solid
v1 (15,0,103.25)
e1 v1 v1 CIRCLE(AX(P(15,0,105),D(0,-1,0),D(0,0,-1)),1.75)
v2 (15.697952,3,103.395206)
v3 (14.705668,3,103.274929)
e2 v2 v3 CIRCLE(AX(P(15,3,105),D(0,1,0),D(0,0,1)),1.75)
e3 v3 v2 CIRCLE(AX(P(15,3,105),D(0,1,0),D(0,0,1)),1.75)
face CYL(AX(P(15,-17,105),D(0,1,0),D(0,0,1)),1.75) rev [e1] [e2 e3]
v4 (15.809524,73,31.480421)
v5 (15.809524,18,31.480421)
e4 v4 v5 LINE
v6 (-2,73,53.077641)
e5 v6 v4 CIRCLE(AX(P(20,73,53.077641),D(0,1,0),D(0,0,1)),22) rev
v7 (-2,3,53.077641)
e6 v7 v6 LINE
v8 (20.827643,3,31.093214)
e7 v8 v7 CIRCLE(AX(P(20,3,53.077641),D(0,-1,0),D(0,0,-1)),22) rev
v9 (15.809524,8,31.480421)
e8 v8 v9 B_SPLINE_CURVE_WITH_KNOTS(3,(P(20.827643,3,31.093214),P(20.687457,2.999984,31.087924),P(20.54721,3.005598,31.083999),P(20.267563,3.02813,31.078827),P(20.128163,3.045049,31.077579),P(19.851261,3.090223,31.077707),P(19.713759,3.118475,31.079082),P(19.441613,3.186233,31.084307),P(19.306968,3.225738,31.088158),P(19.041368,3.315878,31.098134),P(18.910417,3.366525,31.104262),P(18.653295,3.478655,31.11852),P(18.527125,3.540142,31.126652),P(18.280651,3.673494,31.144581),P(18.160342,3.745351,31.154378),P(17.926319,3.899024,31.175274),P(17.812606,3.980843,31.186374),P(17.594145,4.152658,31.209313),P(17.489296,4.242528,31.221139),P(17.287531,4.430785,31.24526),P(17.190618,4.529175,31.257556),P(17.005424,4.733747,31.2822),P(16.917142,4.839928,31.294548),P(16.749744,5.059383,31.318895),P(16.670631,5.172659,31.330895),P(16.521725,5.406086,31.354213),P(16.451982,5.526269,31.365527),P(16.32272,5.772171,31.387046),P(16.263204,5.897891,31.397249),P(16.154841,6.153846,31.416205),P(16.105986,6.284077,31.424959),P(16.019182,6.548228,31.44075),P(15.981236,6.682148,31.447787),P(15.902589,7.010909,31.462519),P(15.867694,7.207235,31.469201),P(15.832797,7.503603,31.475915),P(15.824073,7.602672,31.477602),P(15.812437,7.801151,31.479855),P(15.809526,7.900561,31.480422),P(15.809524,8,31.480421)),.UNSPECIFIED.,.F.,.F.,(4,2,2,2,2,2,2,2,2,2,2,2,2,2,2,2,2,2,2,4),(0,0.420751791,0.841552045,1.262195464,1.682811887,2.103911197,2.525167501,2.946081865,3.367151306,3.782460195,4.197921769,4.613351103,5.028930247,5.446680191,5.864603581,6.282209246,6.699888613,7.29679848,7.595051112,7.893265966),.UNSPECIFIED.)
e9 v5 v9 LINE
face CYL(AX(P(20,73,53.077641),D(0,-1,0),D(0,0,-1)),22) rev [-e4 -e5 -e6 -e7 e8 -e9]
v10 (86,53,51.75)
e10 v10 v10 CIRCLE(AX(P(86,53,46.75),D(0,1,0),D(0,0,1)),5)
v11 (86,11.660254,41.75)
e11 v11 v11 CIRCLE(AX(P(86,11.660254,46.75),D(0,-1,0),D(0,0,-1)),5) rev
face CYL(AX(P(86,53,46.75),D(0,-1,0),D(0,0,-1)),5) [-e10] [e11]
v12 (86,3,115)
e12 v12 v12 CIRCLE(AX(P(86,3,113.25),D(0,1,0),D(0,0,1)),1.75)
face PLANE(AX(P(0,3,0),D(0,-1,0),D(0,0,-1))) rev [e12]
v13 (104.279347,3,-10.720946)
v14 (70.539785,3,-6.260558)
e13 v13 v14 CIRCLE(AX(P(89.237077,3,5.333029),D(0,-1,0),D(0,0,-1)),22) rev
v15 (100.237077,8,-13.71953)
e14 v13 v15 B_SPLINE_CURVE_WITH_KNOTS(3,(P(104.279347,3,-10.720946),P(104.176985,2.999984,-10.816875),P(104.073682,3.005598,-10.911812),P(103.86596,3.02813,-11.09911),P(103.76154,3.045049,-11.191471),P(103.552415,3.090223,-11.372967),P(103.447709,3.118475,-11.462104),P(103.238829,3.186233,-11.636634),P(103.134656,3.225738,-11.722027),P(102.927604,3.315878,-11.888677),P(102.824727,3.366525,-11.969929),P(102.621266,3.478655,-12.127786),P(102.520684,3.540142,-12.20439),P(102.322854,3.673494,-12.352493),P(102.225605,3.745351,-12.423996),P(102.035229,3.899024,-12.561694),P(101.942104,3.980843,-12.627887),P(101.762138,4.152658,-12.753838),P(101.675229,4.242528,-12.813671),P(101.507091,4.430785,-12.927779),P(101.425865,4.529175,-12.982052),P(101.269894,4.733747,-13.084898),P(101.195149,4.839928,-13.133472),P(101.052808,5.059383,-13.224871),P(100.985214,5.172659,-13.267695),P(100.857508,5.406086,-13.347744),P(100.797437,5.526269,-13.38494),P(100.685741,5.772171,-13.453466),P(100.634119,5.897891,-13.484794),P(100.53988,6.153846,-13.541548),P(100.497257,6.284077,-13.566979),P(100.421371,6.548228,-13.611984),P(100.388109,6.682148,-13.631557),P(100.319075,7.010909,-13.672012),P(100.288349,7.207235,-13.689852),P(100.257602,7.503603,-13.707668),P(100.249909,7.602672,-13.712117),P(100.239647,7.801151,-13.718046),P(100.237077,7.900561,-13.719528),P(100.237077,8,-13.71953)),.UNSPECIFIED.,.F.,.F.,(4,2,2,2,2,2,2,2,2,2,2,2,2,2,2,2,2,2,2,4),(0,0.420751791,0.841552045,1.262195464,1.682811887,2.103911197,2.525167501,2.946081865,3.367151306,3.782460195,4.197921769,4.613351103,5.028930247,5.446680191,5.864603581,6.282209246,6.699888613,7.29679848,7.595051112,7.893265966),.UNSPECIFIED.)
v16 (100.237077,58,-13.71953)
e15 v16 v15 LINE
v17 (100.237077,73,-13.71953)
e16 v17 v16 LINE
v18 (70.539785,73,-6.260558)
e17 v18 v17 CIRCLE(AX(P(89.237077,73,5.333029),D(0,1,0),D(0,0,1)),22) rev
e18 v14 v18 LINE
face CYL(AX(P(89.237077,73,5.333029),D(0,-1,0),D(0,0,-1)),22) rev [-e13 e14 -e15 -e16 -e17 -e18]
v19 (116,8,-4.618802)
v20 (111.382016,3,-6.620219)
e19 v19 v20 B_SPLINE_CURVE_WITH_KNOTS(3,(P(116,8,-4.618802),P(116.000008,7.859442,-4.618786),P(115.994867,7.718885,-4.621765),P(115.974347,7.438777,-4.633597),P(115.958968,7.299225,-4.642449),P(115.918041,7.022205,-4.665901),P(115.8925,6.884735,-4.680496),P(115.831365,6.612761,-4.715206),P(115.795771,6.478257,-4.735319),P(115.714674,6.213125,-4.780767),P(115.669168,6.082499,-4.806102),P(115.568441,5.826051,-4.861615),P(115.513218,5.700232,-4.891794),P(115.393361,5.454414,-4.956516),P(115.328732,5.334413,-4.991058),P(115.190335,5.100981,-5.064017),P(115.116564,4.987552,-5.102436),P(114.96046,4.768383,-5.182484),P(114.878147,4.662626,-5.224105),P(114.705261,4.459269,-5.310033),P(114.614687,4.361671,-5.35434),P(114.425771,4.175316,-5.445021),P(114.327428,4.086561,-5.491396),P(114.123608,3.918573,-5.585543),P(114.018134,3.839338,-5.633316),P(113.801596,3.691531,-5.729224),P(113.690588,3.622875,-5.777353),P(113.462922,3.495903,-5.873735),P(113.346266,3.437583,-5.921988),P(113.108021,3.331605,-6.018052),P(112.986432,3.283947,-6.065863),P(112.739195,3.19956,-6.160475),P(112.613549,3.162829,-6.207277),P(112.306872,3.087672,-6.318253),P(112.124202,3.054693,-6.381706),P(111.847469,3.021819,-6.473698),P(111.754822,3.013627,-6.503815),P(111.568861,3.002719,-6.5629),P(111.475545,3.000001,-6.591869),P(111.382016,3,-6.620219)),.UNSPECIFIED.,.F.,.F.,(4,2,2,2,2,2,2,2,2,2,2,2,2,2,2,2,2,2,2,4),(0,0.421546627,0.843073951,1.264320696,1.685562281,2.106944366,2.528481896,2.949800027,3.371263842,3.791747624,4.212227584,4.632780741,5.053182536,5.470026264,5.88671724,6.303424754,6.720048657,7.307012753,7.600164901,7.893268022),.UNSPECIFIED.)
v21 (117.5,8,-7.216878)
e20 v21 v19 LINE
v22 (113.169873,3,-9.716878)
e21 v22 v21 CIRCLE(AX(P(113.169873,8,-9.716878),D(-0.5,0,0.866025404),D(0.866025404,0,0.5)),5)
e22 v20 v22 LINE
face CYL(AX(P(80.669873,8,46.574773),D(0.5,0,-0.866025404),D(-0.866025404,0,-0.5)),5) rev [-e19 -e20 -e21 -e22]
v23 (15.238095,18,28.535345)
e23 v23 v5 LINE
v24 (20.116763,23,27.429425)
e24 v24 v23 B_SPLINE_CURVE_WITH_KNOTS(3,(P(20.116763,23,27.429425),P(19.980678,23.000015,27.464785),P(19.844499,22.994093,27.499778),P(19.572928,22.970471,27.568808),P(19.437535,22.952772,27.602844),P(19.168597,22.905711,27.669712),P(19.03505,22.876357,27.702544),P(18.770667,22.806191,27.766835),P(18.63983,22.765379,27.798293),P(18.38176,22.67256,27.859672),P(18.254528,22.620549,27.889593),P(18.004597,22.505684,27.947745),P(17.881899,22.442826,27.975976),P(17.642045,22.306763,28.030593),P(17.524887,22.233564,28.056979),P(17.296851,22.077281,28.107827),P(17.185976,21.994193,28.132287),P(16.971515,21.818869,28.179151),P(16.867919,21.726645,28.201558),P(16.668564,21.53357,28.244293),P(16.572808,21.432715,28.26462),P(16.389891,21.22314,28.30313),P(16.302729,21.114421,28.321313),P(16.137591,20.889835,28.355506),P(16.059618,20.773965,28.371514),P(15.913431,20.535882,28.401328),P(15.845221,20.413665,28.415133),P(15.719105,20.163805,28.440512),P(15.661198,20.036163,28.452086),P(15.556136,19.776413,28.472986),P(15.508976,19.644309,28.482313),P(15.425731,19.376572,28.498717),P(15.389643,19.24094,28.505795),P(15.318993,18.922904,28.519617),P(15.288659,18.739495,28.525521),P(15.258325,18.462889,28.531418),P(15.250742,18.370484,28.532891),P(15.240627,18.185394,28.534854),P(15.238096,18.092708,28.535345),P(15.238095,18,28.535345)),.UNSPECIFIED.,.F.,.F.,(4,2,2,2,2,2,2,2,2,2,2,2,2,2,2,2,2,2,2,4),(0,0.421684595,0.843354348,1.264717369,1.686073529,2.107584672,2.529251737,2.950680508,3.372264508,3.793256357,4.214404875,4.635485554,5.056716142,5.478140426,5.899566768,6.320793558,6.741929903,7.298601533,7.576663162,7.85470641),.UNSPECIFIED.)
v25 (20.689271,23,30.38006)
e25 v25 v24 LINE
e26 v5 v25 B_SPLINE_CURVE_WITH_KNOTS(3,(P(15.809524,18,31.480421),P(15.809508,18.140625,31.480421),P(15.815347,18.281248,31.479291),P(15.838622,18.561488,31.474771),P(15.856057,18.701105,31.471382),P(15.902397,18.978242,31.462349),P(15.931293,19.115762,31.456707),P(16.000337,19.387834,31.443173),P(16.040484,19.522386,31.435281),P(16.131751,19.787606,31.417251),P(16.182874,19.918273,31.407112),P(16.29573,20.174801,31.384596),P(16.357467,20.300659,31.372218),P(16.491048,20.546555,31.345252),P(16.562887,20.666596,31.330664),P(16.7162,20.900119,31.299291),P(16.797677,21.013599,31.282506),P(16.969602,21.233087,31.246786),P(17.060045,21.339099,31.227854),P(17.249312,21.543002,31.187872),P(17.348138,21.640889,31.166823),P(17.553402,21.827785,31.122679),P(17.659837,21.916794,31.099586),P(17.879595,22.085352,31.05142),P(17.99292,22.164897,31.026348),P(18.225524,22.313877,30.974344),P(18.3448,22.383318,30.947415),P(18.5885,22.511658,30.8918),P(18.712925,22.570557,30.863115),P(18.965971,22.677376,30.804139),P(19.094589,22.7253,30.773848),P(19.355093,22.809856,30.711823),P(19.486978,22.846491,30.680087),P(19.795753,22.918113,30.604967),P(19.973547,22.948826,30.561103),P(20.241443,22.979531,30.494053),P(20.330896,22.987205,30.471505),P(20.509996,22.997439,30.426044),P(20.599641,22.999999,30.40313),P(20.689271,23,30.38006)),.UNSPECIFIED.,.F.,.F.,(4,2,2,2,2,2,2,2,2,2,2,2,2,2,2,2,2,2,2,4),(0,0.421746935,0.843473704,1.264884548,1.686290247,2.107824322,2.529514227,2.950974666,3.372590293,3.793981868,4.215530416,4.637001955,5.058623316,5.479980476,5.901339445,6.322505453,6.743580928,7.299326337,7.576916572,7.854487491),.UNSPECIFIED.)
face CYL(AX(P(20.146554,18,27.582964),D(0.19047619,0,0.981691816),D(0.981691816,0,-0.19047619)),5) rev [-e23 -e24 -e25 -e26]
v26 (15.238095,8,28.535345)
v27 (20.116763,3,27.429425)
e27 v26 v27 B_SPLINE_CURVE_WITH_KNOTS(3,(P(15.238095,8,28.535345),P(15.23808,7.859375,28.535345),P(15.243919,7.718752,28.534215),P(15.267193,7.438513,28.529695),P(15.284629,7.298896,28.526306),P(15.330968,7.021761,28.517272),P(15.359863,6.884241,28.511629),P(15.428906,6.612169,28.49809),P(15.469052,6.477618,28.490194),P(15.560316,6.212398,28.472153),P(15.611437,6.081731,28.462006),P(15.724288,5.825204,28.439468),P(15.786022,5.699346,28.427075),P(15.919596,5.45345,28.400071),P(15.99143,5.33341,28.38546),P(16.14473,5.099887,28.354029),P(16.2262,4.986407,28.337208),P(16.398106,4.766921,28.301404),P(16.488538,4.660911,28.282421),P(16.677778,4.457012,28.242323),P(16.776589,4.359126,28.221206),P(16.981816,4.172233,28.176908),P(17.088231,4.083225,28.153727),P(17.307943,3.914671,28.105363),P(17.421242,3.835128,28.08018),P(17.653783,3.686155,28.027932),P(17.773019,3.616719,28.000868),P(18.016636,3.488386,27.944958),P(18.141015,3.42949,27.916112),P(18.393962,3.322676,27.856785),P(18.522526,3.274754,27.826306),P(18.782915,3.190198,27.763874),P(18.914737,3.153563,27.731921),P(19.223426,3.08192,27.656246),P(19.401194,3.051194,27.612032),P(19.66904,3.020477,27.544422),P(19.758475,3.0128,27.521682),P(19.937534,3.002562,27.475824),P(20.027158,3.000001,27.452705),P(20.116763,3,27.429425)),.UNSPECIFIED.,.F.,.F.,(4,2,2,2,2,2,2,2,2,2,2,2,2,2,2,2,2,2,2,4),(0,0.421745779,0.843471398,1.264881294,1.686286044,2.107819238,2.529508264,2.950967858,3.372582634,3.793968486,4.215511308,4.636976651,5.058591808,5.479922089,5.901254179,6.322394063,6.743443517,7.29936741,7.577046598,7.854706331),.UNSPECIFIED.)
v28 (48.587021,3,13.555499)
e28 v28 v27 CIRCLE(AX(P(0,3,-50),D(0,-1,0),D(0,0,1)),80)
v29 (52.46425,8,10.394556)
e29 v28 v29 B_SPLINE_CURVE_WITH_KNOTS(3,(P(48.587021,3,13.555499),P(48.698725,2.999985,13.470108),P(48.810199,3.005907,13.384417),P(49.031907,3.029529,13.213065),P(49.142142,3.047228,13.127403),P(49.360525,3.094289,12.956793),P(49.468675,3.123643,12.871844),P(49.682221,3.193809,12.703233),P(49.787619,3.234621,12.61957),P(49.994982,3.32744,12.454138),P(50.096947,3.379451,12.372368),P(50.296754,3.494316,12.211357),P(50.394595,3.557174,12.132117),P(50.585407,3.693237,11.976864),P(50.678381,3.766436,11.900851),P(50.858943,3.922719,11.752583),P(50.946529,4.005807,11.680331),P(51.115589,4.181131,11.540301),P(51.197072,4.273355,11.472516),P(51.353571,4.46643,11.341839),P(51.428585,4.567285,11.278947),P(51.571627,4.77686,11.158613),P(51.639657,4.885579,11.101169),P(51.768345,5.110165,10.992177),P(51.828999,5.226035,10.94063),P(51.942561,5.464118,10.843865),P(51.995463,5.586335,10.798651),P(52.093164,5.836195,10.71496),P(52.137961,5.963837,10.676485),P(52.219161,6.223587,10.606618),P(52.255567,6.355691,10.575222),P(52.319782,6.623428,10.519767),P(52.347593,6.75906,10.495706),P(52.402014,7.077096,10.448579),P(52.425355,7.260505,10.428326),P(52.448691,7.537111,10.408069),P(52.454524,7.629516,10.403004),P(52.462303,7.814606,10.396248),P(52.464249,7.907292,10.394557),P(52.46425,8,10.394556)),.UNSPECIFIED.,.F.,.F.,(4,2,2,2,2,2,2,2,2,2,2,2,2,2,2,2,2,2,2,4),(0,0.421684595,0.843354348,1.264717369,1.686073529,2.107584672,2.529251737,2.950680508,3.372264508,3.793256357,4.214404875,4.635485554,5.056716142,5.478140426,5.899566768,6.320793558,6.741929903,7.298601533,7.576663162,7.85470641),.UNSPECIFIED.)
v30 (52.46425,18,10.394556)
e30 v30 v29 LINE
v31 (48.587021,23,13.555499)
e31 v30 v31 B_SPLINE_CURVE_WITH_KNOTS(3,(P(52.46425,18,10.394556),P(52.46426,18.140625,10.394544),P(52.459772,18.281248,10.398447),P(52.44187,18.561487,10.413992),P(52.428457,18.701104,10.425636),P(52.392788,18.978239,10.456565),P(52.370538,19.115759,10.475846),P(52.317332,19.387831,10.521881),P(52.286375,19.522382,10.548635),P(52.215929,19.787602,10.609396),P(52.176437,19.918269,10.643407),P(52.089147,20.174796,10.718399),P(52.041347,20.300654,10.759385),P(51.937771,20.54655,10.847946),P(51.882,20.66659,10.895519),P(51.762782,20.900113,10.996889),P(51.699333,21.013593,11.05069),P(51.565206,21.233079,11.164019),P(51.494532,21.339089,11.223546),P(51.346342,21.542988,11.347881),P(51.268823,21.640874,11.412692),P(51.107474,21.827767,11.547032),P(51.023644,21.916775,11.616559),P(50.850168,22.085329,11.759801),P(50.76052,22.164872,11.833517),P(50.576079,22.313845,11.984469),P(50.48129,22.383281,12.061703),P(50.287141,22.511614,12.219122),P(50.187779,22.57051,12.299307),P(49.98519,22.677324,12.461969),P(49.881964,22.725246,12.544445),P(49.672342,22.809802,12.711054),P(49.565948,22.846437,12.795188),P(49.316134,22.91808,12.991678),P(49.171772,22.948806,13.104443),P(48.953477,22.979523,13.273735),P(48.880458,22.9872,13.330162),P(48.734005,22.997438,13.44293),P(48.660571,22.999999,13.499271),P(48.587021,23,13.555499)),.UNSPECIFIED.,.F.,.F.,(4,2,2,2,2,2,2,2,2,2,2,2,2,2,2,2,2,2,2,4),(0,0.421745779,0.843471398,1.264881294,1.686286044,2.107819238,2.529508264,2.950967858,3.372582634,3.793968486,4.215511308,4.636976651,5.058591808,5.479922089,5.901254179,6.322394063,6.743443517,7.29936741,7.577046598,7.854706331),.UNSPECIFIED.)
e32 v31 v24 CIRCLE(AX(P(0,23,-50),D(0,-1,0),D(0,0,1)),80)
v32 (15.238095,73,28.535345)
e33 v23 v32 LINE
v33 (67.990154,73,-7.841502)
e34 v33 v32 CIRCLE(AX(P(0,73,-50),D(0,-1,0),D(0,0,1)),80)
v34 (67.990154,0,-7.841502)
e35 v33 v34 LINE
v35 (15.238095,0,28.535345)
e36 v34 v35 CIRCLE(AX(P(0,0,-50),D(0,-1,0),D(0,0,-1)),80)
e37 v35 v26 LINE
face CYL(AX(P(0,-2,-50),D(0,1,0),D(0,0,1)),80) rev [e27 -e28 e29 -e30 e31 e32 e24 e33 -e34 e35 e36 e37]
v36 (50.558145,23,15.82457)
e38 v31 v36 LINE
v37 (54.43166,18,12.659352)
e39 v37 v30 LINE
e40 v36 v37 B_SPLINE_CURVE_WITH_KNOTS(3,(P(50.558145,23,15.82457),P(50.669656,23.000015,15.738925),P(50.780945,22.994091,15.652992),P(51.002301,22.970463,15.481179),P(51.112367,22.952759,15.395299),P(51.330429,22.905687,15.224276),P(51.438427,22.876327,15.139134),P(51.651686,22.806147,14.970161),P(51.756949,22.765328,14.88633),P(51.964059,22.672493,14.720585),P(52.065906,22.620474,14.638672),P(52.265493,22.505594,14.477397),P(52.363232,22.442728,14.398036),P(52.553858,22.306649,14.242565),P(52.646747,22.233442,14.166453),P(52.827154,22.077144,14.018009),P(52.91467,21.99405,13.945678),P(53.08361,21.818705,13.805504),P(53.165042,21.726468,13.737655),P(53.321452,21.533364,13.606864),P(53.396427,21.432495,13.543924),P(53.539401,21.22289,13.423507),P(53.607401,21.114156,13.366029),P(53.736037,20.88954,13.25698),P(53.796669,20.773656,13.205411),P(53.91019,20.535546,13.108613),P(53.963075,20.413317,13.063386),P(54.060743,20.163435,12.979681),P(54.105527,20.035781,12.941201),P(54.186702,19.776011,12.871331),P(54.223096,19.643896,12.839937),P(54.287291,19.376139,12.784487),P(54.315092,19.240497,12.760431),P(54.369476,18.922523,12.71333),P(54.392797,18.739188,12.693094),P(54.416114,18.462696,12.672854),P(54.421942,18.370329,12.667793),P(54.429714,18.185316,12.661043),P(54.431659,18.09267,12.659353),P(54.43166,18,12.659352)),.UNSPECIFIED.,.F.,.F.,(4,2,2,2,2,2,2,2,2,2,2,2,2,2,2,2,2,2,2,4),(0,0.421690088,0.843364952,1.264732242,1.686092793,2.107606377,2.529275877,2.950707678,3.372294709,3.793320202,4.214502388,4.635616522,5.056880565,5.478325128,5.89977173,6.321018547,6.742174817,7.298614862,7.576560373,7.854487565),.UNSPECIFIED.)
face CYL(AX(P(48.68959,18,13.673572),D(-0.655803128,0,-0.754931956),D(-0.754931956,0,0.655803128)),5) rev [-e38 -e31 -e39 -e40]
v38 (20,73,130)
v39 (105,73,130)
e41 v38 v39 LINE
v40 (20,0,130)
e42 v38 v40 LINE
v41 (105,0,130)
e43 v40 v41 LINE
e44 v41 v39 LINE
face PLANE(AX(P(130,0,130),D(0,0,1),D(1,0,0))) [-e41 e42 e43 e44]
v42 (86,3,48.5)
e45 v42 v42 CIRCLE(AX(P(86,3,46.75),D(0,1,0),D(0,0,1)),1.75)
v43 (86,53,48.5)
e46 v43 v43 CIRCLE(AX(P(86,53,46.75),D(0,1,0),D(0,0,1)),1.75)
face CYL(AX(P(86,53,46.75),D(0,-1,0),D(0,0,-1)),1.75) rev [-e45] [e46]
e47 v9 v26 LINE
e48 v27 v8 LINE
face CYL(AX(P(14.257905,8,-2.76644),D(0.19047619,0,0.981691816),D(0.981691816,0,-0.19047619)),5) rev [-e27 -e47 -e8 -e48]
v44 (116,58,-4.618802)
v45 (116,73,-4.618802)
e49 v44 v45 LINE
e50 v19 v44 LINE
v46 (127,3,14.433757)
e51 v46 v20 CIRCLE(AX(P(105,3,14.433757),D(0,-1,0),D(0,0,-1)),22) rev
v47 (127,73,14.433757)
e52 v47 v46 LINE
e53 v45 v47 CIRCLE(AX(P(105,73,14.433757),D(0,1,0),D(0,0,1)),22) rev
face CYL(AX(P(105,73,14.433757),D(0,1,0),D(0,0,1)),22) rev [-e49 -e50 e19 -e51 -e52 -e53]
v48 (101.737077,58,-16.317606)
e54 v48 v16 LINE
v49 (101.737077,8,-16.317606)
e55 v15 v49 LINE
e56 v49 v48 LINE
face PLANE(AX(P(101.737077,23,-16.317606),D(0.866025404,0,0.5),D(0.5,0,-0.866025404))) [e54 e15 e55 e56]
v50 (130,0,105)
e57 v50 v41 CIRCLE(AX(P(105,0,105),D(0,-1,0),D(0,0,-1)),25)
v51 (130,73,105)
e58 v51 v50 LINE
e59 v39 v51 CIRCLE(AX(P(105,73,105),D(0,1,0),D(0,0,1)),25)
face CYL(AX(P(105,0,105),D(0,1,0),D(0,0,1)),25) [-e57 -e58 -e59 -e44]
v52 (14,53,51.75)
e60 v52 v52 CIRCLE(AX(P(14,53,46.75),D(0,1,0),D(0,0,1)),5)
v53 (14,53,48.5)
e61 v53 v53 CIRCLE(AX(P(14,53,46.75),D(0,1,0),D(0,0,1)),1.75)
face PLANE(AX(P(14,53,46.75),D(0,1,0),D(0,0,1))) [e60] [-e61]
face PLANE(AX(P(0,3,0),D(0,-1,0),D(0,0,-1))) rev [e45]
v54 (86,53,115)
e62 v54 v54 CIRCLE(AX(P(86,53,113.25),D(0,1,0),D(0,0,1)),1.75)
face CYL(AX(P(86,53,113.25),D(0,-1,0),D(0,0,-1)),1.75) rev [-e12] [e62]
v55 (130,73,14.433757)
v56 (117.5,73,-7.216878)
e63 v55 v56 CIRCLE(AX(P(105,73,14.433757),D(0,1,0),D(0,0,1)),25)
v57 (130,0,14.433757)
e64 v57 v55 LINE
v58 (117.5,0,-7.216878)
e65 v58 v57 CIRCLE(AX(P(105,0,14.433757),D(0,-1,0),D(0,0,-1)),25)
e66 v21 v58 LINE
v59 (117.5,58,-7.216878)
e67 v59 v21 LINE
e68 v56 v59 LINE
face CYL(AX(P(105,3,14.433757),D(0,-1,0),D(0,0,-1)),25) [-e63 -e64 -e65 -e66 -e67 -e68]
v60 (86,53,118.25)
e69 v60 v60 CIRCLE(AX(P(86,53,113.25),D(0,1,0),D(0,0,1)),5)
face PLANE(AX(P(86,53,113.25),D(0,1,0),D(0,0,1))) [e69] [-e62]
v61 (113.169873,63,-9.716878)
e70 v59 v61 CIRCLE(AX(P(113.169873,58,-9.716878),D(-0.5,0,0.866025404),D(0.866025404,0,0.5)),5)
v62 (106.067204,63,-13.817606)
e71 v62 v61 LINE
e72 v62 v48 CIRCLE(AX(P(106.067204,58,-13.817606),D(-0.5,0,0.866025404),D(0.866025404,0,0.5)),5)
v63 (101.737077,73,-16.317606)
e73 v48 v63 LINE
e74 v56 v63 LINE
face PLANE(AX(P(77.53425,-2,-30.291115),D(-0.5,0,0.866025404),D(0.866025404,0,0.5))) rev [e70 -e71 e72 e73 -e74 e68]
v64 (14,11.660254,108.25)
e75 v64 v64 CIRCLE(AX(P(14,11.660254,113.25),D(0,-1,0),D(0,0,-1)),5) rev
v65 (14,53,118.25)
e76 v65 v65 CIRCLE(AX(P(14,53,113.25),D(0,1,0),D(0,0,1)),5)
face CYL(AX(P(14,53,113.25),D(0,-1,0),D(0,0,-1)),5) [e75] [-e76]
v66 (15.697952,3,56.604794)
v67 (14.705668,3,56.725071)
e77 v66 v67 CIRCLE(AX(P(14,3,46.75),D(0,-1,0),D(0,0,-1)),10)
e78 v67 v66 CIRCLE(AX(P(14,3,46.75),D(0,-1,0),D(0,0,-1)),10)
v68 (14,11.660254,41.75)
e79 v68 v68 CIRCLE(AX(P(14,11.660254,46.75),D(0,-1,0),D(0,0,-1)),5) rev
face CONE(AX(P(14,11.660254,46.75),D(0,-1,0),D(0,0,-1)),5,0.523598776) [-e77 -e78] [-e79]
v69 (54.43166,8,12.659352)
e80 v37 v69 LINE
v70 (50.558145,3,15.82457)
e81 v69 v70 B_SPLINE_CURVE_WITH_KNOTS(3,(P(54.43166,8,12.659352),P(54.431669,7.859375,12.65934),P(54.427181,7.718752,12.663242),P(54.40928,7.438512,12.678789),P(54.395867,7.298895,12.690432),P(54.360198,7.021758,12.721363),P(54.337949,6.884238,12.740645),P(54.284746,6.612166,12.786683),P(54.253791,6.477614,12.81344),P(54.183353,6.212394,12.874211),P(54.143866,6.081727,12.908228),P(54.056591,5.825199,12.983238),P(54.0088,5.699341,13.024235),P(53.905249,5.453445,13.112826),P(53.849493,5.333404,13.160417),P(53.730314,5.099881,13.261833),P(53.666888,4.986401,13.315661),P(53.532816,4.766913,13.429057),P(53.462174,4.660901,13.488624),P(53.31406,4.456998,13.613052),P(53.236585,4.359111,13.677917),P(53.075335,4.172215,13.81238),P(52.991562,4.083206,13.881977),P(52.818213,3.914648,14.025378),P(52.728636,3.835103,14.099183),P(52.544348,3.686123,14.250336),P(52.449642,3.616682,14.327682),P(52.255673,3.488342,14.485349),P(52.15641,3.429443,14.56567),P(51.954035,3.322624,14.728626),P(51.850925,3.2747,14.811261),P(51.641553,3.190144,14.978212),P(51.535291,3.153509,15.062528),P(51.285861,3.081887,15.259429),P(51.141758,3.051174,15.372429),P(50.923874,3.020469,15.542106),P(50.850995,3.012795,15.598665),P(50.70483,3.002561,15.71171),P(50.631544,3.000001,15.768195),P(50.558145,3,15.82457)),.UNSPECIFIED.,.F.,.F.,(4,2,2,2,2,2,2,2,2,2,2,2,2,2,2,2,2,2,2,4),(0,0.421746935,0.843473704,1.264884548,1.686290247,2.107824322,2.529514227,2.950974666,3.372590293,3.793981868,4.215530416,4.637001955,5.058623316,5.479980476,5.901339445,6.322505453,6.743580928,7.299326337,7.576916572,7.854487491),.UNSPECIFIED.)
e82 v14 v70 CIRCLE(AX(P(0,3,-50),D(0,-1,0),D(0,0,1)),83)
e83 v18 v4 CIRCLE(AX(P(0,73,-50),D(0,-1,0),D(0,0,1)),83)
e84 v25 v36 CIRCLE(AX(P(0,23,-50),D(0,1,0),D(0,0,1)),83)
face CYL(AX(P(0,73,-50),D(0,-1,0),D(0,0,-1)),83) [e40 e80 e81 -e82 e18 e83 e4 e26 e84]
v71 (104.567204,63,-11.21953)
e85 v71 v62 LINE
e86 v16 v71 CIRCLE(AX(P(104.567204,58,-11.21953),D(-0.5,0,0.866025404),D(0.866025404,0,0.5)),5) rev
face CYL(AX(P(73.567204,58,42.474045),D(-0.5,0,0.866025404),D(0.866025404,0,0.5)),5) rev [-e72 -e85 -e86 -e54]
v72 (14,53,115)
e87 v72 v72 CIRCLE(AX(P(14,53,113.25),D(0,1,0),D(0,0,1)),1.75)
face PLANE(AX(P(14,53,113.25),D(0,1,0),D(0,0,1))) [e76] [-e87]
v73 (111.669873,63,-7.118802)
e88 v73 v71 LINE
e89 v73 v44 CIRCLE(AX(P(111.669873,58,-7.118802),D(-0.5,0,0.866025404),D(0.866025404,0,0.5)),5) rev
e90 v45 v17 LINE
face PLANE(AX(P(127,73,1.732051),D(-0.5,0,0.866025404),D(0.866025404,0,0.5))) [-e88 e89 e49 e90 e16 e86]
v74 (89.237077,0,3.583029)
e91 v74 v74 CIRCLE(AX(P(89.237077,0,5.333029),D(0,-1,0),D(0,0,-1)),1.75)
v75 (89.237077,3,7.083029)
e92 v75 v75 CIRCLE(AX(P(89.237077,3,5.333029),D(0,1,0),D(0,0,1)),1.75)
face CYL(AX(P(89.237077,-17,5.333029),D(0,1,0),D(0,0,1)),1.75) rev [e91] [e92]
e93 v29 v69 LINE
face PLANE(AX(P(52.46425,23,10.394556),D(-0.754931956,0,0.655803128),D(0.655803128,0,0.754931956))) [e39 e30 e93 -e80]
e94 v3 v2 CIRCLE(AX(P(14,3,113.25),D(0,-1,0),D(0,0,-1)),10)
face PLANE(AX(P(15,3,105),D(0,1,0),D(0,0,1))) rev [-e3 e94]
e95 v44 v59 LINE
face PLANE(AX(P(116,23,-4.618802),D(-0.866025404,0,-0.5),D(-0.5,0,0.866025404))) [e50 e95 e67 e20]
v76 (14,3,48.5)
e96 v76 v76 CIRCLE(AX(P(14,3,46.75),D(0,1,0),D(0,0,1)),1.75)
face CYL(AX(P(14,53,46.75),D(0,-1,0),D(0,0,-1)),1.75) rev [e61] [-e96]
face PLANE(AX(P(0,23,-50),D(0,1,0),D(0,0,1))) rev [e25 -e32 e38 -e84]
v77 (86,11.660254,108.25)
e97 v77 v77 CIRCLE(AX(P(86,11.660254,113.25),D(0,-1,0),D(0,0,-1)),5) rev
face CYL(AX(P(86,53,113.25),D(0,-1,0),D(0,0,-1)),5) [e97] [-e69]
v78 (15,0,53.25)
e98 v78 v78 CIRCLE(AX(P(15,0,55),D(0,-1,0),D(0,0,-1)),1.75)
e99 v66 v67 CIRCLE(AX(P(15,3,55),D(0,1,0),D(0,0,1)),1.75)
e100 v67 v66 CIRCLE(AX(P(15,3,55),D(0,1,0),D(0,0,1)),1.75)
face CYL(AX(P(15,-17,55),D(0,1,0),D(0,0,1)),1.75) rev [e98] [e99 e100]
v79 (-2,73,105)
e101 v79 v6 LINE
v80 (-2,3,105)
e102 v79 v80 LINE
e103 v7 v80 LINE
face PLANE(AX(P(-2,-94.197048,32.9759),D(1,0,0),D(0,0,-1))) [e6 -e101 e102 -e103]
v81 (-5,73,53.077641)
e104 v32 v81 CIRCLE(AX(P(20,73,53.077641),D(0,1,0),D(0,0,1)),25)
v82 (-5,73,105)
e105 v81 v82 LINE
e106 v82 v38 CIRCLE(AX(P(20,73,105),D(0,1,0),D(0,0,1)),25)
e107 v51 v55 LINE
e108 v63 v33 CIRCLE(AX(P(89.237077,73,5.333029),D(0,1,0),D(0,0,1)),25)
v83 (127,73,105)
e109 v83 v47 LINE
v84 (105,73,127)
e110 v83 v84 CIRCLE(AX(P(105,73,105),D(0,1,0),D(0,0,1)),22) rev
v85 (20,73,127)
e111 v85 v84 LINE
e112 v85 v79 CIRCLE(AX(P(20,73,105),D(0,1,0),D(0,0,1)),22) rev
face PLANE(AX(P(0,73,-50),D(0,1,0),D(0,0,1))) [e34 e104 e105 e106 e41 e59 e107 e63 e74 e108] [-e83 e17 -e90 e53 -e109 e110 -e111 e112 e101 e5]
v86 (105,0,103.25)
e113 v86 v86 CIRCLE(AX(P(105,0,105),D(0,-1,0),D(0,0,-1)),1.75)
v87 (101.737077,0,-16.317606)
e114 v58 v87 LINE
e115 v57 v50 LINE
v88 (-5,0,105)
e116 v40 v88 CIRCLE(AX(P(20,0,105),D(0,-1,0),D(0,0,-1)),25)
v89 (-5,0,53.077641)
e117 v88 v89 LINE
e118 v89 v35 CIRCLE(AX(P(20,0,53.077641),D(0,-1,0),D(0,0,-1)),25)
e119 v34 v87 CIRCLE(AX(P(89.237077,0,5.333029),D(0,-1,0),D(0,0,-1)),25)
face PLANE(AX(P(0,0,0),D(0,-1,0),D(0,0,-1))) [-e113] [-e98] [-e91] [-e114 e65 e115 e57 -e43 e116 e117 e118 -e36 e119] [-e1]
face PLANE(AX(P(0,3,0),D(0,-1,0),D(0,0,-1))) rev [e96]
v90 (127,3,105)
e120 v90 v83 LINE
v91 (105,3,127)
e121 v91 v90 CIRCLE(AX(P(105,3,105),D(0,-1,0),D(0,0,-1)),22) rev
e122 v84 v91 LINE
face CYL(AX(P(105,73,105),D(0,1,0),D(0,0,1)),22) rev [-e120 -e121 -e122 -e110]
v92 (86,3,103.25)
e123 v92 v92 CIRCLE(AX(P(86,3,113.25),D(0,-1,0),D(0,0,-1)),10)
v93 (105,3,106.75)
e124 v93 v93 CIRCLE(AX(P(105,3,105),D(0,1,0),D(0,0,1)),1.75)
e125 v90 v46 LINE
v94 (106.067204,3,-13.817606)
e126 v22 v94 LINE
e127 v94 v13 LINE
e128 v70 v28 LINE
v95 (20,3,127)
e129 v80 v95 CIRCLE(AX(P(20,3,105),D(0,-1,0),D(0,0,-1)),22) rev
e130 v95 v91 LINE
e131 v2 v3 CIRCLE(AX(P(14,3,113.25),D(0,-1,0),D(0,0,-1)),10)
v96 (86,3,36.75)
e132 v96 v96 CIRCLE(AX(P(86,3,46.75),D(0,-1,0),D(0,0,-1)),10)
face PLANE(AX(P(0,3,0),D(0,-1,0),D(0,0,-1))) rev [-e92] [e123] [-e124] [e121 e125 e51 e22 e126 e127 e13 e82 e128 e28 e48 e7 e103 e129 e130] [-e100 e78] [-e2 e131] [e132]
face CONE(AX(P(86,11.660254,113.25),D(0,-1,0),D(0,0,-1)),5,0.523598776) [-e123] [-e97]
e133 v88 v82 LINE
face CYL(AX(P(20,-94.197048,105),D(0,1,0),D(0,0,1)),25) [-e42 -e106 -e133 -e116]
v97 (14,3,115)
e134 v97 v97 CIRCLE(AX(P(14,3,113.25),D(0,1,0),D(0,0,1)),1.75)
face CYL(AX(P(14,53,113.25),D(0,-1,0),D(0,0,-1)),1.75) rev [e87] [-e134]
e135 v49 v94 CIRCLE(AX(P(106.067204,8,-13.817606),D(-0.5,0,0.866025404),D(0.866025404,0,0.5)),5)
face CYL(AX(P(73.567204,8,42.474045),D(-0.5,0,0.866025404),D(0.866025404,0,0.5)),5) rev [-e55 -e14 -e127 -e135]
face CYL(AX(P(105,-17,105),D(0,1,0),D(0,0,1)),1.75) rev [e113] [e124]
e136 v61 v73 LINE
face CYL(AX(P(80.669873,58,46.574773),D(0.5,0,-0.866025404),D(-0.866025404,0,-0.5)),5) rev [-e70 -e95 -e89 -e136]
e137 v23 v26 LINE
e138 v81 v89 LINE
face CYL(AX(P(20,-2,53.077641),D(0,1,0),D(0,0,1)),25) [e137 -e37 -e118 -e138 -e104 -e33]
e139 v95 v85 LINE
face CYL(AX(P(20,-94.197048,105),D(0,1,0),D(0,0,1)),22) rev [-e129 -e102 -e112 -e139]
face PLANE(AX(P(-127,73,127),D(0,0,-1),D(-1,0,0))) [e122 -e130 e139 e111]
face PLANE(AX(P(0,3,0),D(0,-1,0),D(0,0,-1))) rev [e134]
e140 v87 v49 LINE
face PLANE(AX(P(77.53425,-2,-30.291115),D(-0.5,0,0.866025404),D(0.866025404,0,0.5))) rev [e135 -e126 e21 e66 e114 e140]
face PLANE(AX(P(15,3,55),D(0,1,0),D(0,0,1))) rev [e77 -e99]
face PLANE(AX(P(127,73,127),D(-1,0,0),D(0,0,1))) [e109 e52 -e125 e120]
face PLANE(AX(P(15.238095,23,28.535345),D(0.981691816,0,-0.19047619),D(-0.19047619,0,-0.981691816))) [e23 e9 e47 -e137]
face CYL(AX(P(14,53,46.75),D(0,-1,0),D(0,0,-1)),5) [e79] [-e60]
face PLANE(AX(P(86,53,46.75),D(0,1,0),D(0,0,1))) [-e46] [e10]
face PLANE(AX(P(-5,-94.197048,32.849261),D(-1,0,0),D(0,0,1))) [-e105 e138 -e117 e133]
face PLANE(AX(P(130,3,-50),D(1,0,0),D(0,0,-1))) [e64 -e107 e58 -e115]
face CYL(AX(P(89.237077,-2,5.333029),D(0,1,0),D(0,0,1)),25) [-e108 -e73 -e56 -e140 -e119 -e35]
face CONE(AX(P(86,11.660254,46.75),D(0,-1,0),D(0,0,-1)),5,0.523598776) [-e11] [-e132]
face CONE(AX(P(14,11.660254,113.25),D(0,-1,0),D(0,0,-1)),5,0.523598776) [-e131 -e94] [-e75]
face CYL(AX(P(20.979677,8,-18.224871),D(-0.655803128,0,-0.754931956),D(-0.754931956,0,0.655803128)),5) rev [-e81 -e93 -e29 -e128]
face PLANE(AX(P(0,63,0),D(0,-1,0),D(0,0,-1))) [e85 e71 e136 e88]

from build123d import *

# Parameters (mm, degrees)
SKETCH1_W           = 260
SKETCH1_H           = 100
BOSS_EXTRUDE1_DEPTH = 3
CUT_EXTRUDE1_DEPTH  = 5
SKETCH5_W           = 260
SKETCH5_H           = 80
BOSS_EXTRUDE4_DEPTH = 3
BOSS_EXTRUDE5_START = 70
BOSS_EXTRUDE5_DEPTH = 70
BOSS_EXTRUDE6_DEPTH = 70
CUT_EXTRUDE3_DEPTH  = 198.810515393
SKETCH10_R          = 5
SKETCH10_R_2        = 1.75
BOSS_EXTRUDE7_DEPTH = 50
CHAMFER1_SIZE       = 5
CHAMFER1_SIZE2      = 8.660254038
FILLET1_R           = 22
FILLET2_R           = 25
CUT_EXTRUDE4_START  = 20
CUT_EXTRUDE4_DEPTH  = 20
SKETCH12_R          = 1.75
CUT_EXTRUDE5_DEPTH  = 20
CUT_EXTRUDE6_DEPTH  = 40
FILLET3_R           = 5


with BuildPart() as part:
    # Sketch1 → Boss-Extrude1 (new body)
    with BuildSketch(Plane(origin=(0, 0, 0), x_dir=(1, 0, 0), z_dir=(0, 1, 0))):
        Rectangle(SKETCH1_W, SKETCH1_H)
    extrude(amount=BOSS_EXTRUDE1_DEPTH)

    # Sketch4 → Cut-Extrude1 (cut)
    with BuildSketch(Plane(origin=(0, 3, 0), x_dir=(1, 0, 0), z_dir=(0, 1, 0))):
        with BuildLine():
            Line((-77.534249575, 30.291115131), (-130, 0))
            Line((-130, 0), (-130, 50))
            Line((-130, 50), (130, 50))
            Line((130, 50), (130, 0))
            Line((130, 0), (77.534249575, 30.291115131))
            ThreePointArc((77.534249575, 30.291115131), (0, -30), (-77.534249575, 30.291115131))
        make_face()
    extrude(amount=-CUT_EXTRUDE1_DEPTH, mode=Mode.SUBTRACT)

    # Sketch5 → Boss-Extrude4 (add)
    with BuildSketch(Plane(origin=(0, 3, 0), x_dir=(1, 0, 0), z_dir=(0, 1, 0))):
        with Locations((0, -90)):
            Rectangle(SKETCH5_W, SKETCH5_H)
    extrude(amount=-BOSS_EXTRUDE4_DEPTH)

    # Sketch6 → Boss-Extrude5 (add)
    with BuildSketch(Plane(origin=(0, 3, 0), x_dir=(1, 0, 0), z_dir=(0, 1, 0)).offset(BOSS_EXTRUDE5_START)):
        with BuildLine():
            Line((-77.534249575, 30.291115131), (-130, 0))
            Line((-130, 0), (-130, -130))
            Line((-130, -130), (130, -130))
            Line((130, -130), (130, 0))
            Line((130, 0), (77.534249575, 30.291115131))
            ThreePointArc((77.534249575, 30.291115131), (0, -30), (-77.534249575, 30.291115131))
        make_face()
        with BuildLine():
            Line((-79.381629809, 25.76042804), (-127, -1.732050808))
            Line((-127, -1.732050808), (-127, -127))
            Line((-127, -127), (127, -127))
            Line((127, -127), (127, -1.732050808))
            Line((127, -1.732050808), (79.381629809, 25.76042804))
            ThreePointArc((79.381629809, 25.76042804), (0, -33), (-79.381629809, 25.76042804))
        make_face(mode=Mode.SUBTRACT)
    extrude(amount=-BOSS_EXTRUDE5_DEPTH)

    # Sketch7 → Boss-Extrude6 (add)
    with BuildSketch(Plane(origin=(0, 73, 0), x_dir=(1, 0, 0), z_dir=(0, 1, 0))):
        with BuildLine():
            Line((-5, -32.849260709), (-5, -130))
            Line((-5, -130), (-2, -130))
            Line((-2, -130), (-2, -32.975900116))
            ThreePointArc((-2, -32.975900116), (-3.500572722, -32.92614781), (-5, -32.849260709))
        make_face()
    extrude(amount=-BOSS_EXTRUDE6_DEPTH)

    # Sketch9 → Cut-Extrude3 (cut, through all)
    with BuildSketch(Plane(origin=(0, 73, 0), x_dir=(1, 0, 0), z_dir=(0, 1, 0))):
        Polygon((-5, -32.849260709), (-5, -144.876678539), (-379.728059333, -144.876678539), (-379.728059333, 52.069032857), (-5, 52.069032857), align=None)
    extrude(amount=-CUT_EXTRUDE3_DEPTH, mode=Mode.SUBTRACT)

    # Sketch10 → Boss-Extrude7 (add)
    # profile 1 of 4: a face of its own
    with BuildSketch(Plane(origin=(0, 3, 0), x_dir=(1, 0, 0), z_dir=(0, 1, 0))):
        with Locations(Location((14, -46.75, 0), (0, 0, 90))):
            Circle(SKETCH10_R)
        with Locations(Location((14, -46.75, 0), (0, 0, 270))):
            Circle(SKETCH10_R_2, mode=Mode.SUBTRACT)
    # profile 2 of 4: a face of its own
    with BuildSketch(Plane(origin=(0, 3, 0), x_dir=(1, 0, 0), z_dir=(0, 1, 0))):
        with Locations(Location((86, -46.75, 0), (0, 0, 90))):
            Circle(SKETCH10_R)
        with Locations(Location((86, -46.75, 0), (0, 0, 270))):
            Circle(SKETCH10_R_2, mode=Mode.SUBTRACT)
    # profile 3 of 4: a face of its own
    with BuildSketch(Plane(origin=(0, 3, 0), x_dir=(1, 0, 0), z_dir=(0, 1, 0))):
        with Locations(Location((86, -113.25, 0), (0, 0, 90))):
            Circle(SKETCH10_R)
        with Locations(Location((86, -113.25, 0), (0, 0, 270))):
            Circle(SKETCH10_R_2, mode=Mode.SUBTRACT)
    # profile 4 of 4: a face of its own
    with BuildSketch(Plane(origin=(0, 3, 0), x_dir=(1, 0, 0), z_dir=(0, 1, 0))):
        with Locations(Location((14, -113.25, 0), (0, 0, 90))):
            Circle(SKETCH10_R)
        with Locations(Location((14, -113.25, 0), (0, 0, 270))):
            Circle(SKETCH10_R_2, mode=Mode.SUBTRACT)
    extrude(amount=BOSS_EXTRUDE7_DEPTH)

    # Chamfer1
    chamfer1_edges = [part.edges().sort_by_distance(p)[0] for p in [
        (86, 3, 51.75),
        (14, 3, 51.75),
        (86, 3, 118.25),
        (14, 3, 118.25),
    ]]
    chamfer1_side = [part.faces().sort_by_distance(p)[0] for p in [
        (68.049806081, 3, 64.998636776),
    ]]
    chamfer(chamfer1_edges, length=CHAMFER1_SIZE, length2=CHAMFER1_SIZE2, reference=chamfer1_side[0])

    # Fillet1
    fillet1_edges = [part.edges().sort_by_distance(p)[0] for p in [
        (-2, 38, 127),
        (-2, 38, 32.975900116),
        (127, 38, 127),
        (127, 38, 1.732050808),
        (79.381629809, 38, -25.76042804),
    ]]
    fillet(fillet1_edges, radius=FILLET1_R)

    # Fillet2
    fillet2_edges = [part.edges().sort_by_distance(p)[0] for p in [
        (-5, 36.5, 29.843597113),
        (-5, 36.5, 130),
        (77.534249575, 36.5, -30.291115131),
        (130, 36.5, 0),
        (130, 36.5, 130),
    ]]
    fillet(fillet2_edges, radius=FILLET2_R)

    # Sketch11 → Cut-Extrude4 (cut)
    with BuildSketch(Plane(origin=(0, 3, 0), x_dir=(1, 0, 0), z_dir=(0, 1, 0)).offset(CUT_EXTRUDE4_START)):
        with BuildLine():
            Line((52.464250206, -10.394556462), (54.431659589, -12.65935233))
            ThreePointArc((54.431659589, -12.65935233), (36.359512028, -24.612236832), (15.80952381, -31.480420697))
            Line((15.80952381, -31.480420697), (15.238095238, -28.53534525))
            ThreePointArc((15.238095238, -28.53534525), (35.045312798, -21.915408995), (52.464250206, -10.394556462))
        make_face()
        Polygon((101.737077009, 16.317606197), (100.237077009, 13.719529986), (116, 4.618802154), (117.5, 7.216878365), align=None)
    extrude(amount=-CUT_EXTRUDE4_DEPTH, mode=Mode.SUBTRACT)

    # Sketch12 → Cut-Extrude5 (cut)
    with BuildSketch(Plane(origin=(0, 3, 0), x_dir=(1, 0, 0), z_dir=(0, 1, 0))):
        with Locations(Location((89.237077009, -5.333028897, 0), (0, 0, 270))):
            Circle(SKETCH12_R)
        with Locations(Location((105, -105, 0), (0, 0, 270))):
            Circle(SKETCH12_R)
        with Locations(Location((15, -105, 0), (0, 0, 66.494954424))):
            Circle(SKETCH12_R)
        with Locations(Location((15, -55, 0), (0, 0, 260.317408662))):
            Circle(SKETCH12_R)
    extrude(amount=-CUT_EXTRUDE5_DEPTH, mode=Mode.SUBTRACT)

    # Sketch14 → Cut-Extrude6 (cut)
    with BuildSketch(Plane.XZ.offset(-23)):
        Polygon((101.737077009, -16.317606197), (117.5, -7.216878365), (116, -4.618802154), (100.237077009, -13.719529986), align=None)
    extrude(amount=-CUT_EXTRUDE6_DEPTH, mode=Mode.SUBTRACT)

    # Fillet3
    # the kernel refuses this fillet: 5 mm, written as the material it adds along each edge
    with BuildSketch(Plane(origin=(101.737077009, 3, -16.317606197), x_dir=(0.8660254037844373, 0, 0.5000000000000024), z_dir=(-0.5000000000000026, 0, 0.8660254037844373))) as fillet3_piece_1_section:
        with BuildLine():
            CenterArc((FILLET3_R, FILLET3_R), FILLET3_R, 180, 90)
            Line((0, FILLET3_R), (0, 0))
            Line((0, 0), (FILLET3_R, 0))
        make_face()
    fillet3_piece_1 = extrude(amount=15.5, mode=Mode.PRIVATE)
    fillet3_piece_1 = fillet3_piece_1 - Plane(origin=(89.237077009, 3.433810283, 5.333028897), x_dir=(-0.8498769238912803, 0, -0.5269812275945843), z_dir=(0, -1, 0)) * Cylinder(22, 52, mode=Mode.PRIVATE)
    add(fillet3_piece_1)
    with BuildSketch(Plane(origin=(109.75, 3, 6.206515394), x_dir=(-0.8660254037844346, 0, -0.500000000000007), z_dir=(0.500000000000007, 0, -0.8660254037844346))) as fillet3_piece_2_section:
        with BuildLine():
            CenterArc((FILLET3_R, FILLET3_R), FILLET3_R, 180, 90)
            Line((0, FILLET3_R), (0, 0))
            Line((0, 0), (FILLET3_R, 0))
        make_face()
    fillet3_piece_2 = extrude(amount=15.5, mode=Mode.PRIVATE)
    fillet3_piece_2 = fillet3_piece_2 - Plane(origin=(105, 4.115508028, 14.43375673), x_dir=(0.5000000000000037, 0, -0.8660254037844366), z_dir=(0, -1, 0)) * Cylinder(22, 51, mode=Mode.PRIVATE)
    add(fillet3_piece_2)
    with BuildSketch(Plane(origin=(44.266711112, 3, 0.957907015), x_dir=(-0.754931955778907, 0, 0.6558031275800951), z_dir=(0.6558031275800951, 0, 0.754931955778907))) as fillet3_piece_3_section:
        with BuildLine():
            CenterArc((FILLET3_R, -FILLET3_R), FILLET3_R, 90, 90)
            Line((0, -FILLET3_R), (0, 0))
            Line((0, 0), (FILLET3_R, 0))
        make_face()
    fillet3_piece_3 = extrude(amount=28, mode=Mode.PRIVATE)
    fillet3_piece_3 = fillet3_piece_3 & Plane(origin=(0, 4.116736713, -50), x_dir=(0.9564051784275456, 0, 0.2920430356590872), z_dir=(0, 1, 0)) * Cylinder(83, 77, mode=Mode.PRIVATE)
    fillet3_piece_3 = fillet3_piece_3 - Plane(origin=(0, 4.116736713, -50), x_dir=(0.9691781196921706, 0, 0.2463610608638238), z_dir=(0, 1, 0)) * Cylinder(80, 77, mode=Mode.PRIVATE)
    add(fillet3_piece_3)
    with BuildSketch(Plane(origin=(18.19047619, 3, 43.751568392), x_dir=(0.9816918156232519, 0, -0.19047619047619338), z_dir=(-0.19047619047619338, 0, -0.981691815623252))) as fillet3_piece_4_section:
        with BuildLine():
            CenterArc((FILLET3_R, -FILLET3_R), FILLET3_R, 90, 90)
            Line((0, -FILLET3_R), (0, 0))
            Line((0, 0), (FILLET3_R, 0))
        make_face()
    fillet3_piece_4 = extrude(amount=28, mode=Mode.PRIVATE)
    fillet3_piece_4 = fillet3_piece_4 - Plane(origin=(20, 4.115502573, 53.07764064), x_dir=(-0.19047619047619013, 0, -0.9816918156232526), z_dir=(0, -1, 0)) * Cylinder(22, 77, mode=Mode.PRIVATE)
    fillet3_piece_4 = fillet3_piece_4 - Plane(origin=(0, 4.115502573, -50), x_dir=(0.9691781196921706, 0, 0.2463610608638238), z_dir=(0, 1, 0)) * Cylinder(80, 77, mode=Mode.PRIVATE)
    add(fillet3_piece_4)
    with BuildSketch(Plane(origin=(44.266711112, 23, 0.957907015), x_dir=(-0.754931955778907, 0, 0.6558031275800951), z_dir=(0.6558031275800951, 0, 0.754931955778907))) as fillet3_piece_5_section:
        with BuildLine():
            CenterArc((FILLET3_R, FILLET3_R), FILLET3_R, 180, 90)
            Line((0, FILLET3_R), (0, 0))
            Line((0, 0), (FILLET3_R, 0))
        make_face()
    fillet3_piece_5 = extrude(amount=28, mode=Mode.PRIVATE)
    fillet3_piece_5 = fillet3_piece_5 & Plane(origin=(0, 21.883263287, -50), x_dir=(0.9564051784275456, 0, 0.2920430356590872), z_dir=(0, 1, 0)) * Cylinder(83, 77, mode=Mode.PRIVATE)
    fillet3_piece_5 = fillet3_piece_5 - Plane(origin=(0, 21.883263287, -50), x_dir=(0.9691781196921706, 0, 0.2463610608638238), z_dir=(0, 1, 0)) * Cylinder(80, 77, mode=Mode.PRIVATE)
    add(fillet3_piece_5)
    with BuildSketch(Plane(origin=(18.19047619, 23, 43.751568392), x_dir=(0, -1, 0), z_dir=(-0.19047619047619338, 0, -0.981691815623252))) as fillet3_piece_6_section:
        with BuildLine():
            CenterArc((FILLET3_R, -FILLET3_R), FILLET3_R, 90, 90)
            Line((0, -FILLET3_R), (0, 0))
            Line((0, 0), (FILLET3_R, 0))
        make_face()
    fillet3_piece_6 = extrude(amount=28, mode=Mode.PRIVATE)
    fillet3_piece_6 = fillet3_piece_6 & Plane(origin=(0, 21.870297326, -50), x_dir=(0.9564051784275456, 0, 0.2920430356590872), z_dir=(0, 1, 0)) * Cylinder(83, 77, mode=Mode.PRIVATE)
    fillet3_piece_6 = fillet3_piece_6 - Plane(origin=(0, 21.870297326, -50), x_dir=(0.9691781196921706, 0, 0.2463610608638238), z_dir=(0, 1, 0)) * Cylinder(80, 77, mode=Mode.PRIVATE)
    add(fillet3_piece_6)
    with BuildSketch(Plane(origin=(100.237077009, 63, -13.719529986), x_dir=(0.866025403784437, 0, 0.5000000000000028), z_dir=(0.5000000000000028, 0, -0.866025403784437))) as fillet3_piece_7:
        with BuildLine():
            CenterArc((FILLET3_R, FILLET3_R), FILLET3_R, 180, 90)
            Line((0, FILLET3_R), (0, 0))
            Line((0, 0), (FILLET3_R, 0))
        make_face()
    extrude(amount=3)
    with BuildSketch(Plane(origin=(117.5, 63, -7.216878365), x_dir=(0, -1, 0), z_dir=(-0.500000000000007, 0, 0.8660254037844346))) as fillet3_piece_8:
        with BuildLine():
            CenterArc((FILLET3_R, -FILLET3_R), FILLET3_R, 90, 90)
            Line((0, -FILLET3_R), (0, 0))
            Line((0, 0), (FILLET3_R, 0))
        make_face()
    extrude(amount=3)


solid = part.part
